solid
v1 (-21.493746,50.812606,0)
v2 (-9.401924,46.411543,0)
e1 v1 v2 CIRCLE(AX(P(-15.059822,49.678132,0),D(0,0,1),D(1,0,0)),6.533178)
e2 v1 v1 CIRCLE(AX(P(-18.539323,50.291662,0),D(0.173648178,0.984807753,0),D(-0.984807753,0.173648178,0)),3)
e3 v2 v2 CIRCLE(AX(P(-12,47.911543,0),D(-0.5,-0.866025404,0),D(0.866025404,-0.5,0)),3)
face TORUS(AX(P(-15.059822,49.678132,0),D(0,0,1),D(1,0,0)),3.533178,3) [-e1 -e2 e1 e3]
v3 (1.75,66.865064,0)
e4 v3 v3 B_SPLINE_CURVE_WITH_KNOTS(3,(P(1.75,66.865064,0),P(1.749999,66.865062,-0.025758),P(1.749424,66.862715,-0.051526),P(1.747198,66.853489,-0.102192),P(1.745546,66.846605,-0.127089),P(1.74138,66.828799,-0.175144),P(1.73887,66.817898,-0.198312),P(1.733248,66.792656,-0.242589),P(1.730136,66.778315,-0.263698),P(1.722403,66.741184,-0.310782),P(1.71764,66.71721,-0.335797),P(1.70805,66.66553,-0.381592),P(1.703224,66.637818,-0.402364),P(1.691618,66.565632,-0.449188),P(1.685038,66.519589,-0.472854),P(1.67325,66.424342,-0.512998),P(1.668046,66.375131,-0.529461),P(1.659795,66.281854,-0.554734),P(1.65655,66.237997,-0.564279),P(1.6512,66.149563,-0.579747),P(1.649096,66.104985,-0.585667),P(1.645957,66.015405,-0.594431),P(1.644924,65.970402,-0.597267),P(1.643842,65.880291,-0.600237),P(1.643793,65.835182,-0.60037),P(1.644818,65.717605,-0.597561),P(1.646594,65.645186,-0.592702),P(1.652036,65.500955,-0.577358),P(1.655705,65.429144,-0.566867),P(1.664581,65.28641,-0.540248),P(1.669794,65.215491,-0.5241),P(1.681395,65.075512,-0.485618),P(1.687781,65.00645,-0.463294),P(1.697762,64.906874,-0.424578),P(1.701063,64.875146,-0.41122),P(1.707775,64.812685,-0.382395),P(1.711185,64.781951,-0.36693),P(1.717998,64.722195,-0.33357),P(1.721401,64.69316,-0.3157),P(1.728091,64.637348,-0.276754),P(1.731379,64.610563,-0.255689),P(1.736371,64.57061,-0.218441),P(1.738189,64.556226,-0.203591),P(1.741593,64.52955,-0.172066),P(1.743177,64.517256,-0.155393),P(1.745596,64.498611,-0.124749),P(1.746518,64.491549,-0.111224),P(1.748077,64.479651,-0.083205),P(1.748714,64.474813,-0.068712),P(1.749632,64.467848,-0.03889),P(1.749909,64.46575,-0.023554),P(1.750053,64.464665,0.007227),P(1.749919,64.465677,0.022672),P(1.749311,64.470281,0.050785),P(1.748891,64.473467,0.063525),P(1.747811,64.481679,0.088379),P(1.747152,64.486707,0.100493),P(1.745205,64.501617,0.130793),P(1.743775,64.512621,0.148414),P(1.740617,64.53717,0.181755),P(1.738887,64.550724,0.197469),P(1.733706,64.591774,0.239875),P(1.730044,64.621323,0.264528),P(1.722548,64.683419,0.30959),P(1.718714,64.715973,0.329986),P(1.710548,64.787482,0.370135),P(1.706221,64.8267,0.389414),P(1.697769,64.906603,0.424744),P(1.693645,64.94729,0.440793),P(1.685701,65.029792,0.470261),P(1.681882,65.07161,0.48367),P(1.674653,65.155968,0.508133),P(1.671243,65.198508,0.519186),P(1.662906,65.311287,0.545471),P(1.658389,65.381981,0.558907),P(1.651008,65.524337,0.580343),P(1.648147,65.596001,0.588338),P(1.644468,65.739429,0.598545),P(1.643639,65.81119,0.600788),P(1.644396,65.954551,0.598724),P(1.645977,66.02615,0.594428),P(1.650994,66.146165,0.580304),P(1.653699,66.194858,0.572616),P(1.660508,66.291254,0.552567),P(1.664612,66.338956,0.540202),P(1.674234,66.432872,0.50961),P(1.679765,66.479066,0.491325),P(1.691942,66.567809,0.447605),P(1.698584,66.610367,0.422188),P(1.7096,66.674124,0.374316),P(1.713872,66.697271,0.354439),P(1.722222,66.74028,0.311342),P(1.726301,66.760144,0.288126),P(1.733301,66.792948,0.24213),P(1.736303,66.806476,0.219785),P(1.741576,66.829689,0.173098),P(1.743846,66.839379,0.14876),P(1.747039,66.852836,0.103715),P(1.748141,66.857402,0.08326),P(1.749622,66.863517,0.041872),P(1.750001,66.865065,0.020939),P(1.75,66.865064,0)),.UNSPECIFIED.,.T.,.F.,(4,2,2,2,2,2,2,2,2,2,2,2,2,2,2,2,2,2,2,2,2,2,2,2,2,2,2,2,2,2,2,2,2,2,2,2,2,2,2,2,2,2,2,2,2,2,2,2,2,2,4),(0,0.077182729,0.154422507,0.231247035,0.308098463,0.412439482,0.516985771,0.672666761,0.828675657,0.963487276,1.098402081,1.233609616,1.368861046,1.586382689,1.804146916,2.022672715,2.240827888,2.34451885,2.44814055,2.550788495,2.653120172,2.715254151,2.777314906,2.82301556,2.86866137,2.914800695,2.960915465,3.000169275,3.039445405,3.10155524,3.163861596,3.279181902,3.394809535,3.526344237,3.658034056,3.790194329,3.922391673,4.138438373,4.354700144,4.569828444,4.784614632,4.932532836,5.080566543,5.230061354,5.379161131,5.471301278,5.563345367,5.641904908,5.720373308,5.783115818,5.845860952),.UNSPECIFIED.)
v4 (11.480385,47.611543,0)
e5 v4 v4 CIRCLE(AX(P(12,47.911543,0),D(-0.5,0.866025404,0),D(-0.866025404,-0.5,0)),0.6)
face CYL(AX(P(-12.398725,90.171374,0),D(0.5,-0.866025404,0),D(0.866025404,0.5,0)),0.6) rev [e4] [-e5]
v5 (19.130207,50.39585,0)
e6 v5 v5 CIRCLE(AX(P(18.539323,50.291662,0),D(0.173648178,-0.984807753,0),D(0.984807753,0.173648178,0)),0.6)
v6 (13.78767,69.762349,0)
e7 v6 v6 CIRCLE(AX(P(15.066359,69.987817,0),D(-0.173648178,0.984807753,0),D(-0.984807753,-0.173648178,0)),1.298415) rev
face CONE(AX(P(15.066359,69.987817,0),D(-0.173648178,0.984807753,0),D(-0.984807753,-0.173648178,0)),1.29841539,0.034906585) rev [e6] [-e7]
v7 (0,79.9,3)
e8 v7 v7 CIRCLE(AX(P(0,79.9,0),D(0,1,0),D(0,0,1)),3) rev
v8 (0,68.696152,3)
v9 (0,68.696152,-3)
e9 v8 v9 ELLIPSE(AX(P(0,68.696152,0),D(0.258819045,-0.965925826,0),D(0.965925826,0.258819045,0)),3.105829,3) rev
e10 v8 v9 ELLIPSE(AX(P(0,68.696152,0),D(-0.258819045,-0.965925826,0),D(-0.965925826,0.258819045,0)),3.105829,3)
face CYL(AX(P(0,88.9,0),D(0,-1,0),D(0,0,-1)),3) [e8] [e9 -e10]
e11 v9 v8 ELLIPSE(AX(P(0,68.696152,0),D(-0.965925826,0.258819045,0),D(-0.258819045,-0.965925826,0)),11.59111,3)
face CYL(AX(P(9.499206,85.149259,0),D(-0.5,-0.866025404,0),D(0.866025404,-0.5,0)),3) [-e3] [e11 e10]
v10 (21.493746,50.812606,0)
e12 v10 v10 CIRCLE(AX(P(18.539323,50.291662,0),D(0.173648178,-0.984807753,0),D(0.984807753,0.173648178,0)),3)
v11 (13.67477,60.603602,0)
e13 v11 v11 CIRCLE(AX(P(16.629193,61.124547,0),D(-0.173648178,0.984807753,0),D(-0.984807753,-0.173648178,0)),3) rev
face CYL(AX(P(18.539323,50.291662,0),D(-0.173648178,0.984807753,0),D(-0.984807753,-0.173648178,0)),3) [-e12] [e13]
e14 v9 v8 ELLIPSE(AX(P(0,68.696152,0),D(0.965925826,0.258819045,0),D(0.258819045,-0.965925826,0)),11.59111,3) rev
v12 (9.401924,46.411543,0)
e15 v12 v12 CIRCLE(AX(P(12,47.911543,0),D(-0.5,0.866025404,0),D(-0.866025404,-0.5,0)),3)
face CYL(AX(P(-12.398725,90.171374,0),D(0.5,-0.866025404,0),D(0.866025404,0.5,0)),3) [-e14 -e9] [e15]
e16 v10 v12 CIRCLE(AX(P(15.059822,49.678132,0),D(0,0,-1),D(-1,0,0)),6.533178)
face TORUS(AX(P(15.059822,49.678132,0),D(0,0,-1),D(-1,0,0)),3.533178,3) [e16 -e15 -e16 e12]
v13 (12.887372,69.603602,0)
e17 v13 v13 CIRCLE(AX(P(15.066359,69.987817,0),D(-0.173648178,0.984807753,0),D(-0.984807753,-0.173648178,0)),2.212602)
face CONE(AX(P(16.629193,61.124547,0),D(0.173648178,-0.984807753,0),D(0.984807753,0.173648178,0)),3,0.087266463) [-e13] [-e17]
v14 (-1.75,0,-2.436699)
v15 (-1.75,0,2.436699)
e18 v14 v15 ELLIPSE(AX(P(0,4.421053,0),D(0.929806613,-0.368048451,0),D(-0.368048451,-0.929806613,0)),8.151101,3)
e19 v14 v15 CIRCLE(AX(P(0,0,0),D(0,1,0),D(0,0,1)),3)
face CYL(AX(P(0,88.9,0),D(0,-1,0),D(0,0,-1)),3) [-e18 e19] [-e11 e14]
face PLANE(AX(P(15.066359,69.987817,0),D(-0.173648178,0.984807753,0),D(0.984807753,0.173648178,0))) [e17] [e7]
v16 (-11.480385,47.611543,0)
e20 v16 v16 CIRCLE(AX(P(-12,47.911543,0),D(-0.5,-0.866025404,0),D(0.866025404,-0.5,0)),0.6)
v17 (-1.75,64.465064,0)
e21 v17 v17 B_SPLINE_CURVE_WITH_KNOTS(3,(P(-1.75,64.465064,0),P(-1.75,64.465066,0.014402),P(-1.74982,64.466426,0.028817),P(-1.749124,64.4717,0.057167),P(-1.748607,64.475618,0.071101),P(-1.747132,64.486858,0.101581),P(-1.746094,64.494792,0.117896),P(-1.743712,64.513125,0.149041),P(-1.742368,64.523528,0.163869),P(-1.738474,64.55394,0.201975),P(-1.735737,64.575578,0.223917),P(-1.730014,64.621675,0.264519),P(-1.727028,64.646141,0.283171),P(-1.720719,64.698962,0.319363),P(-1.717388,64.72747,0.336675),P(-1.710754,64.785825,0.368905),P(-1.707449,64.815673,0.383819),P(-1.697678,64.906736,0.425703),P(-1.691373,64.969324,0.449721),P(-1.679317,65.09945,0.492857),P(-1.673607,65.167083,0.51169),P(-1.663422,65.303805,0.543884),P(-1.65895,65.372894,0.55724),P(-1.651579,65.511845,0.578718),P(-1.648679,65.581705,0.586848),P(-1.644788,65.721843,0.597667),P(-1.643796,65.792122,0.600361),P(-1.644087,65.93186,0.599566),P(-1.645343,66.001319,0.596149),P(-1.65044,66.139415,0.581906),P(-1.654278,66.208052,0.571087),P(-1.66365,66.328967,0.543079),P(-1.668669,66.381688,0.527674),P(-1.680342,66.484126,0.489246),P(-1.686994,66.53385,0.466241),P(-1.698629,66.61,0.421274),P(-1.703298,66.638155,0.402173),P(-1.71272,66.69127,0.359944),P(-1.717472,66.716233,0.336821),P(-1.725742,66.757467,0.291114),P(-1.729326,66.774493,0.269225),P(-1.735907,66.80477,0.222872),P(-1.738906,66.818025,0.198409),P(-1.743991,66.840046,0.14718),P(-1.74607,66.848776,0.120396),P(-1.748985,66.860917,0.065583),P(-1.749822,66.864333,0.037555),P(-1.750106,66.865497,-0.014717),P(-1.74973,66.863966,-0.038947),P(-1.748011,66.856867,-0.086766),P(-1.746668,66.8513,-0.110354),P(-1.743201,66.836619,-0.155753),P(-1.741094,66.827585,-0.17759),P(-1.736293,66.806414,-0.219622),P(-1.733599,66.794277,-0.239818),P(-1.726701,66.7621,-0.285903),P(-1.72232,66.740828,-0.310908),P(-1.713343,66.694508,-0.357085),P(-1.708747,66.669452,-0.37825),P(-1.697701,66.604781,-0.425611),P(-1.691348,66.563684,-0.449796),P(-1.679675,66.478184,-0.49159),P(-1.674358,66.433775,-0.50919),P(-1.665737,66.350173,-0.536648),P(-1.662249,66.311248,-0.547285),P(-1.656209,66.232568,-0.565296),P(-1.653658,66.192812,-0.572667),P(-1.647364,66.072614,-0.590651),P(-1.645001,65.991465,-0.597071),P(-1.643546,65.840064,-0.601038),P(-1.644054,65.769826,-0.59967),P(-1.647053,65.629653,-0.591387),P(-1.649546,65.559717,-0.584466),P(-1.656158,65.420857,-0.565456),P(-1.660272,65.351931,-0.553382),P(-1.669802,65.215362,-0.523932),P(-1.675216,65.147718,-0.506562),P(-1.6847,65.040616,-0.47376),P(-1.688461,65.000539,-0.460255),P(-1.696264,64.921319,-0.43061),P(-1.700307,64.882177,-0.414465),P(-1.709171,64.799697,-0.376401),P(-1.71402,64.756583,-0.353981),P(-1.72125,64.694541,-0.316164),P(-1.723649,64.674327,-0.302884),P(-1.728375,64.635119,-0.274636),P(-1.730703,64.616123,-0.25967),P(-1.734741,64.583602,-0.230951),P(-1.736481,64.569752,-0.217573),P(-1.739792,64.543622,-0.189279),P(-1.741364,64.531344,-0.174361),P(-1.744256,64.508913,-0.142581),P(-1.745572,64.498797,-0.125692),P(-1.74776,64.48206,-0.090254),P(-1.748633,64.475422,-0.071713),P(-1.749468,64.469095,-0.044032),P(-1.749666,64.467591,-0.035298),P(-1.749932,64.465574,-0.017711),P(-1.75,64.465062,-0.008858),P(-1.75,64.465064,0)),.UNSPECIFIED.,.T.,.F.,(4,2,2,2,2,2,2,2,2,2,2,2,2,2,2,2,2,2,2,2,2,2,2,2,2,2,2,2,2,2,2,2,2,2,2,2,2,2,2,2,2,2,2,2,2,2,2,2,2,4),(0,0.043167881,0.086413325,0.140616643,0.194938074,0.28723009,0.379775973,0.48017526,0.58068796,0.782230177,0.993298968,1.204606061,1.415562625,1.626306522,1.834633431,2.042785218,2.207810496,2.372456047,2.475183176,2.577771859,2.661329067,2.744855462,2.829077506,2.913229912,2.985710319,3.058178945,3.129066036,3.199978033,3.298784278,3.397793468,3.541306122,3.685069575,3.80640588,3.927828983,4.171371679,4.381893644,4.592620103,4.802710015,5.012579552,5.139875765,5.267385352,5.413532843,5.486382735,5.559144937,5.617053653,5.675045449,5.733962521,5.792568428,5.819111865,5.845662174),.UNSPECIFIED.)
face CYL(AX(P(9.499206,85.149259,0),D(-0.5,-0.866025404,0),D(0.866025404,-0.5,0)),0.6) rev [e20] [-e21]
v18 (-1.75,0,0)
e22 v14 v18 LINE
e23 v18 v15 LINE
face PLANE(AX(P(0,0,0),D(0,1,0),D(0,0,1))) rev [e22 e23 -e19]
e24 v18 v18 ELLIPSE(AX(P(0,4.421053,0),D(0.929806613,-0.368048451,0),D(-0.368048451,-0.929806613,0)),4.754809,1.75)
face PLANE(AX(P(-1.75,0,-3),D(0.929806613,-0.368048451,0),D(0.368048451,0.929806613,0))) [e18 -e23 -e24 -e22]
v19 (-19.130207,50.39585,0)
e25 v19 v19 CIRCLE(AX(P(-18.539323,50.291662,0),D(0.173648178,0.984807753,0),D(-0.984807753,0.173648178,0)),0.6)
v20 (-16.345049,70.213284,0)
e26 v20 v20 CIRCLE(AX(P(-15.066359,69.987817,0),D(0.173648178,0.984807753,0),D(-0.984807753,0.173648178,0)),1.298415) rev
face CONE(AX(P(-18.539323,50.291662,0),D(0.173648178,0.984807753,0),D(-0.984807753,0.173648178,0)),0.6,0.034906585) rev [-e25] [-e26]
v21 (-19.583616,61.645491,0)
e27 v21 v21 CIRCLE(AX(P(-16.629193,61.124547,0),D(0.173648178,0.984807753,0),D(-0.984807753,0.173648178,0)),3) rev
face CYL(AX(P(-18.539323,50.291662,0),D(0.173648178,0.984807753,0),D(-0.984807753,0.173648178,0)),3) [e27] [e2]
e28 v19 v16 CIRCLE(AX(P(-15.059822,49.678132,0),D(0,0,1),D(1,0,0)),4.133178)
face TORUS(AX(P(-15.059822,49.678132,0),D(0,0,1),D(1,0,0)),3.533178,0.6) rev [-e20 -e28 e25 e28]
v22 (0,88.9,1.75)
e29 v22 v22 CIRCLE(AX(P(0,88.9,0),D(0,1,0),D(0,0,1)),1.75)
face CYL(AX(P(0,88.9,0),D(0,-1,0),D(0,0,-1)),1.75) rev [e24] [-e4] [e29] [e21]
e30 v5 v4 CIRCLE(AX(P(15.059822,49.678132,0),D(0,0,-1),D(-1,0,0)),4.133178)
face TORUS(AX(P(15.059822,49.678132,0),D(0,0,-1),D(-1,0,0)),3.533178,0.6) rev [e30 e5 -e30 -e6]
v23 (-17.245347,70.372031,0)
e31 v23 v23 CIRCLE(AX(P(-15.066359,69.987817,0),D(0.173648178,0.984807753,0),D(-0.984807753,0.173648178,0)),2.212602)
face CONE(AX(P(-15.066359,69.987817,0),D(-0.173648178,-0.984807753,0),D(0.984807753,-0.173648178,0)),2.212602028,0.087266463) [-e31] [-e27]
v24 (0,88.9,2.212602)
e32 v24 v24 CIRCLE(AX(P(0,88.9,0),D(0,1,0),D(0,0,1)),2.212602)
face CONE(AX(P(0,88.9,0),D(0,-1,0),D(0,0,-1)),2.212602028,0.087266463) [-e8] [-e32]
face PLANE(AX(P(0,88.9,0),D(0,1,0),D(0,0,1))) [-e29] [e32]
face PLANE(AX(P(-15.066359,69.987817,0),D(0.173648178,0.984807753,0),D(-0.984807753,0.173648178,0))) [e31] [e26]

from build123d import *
from OCP.BRepFilletAPI import BRepFilletAPI_MakeChamfer

# Parameters (mm, degrees)
SKETCH1_R                       = 3
SKETCH1_R_2                     = 1.75
BOSS_EXTRUDE1_DEPTH             = 88.9
CUT_EXTRUDE1_DEPTH              = 90.001179767
CUT_EXTRUDE1_DEPTH_BACK         = 90.001179767
SKETCH4_R                       = 0.6
CUT_EXTRUDE3_DEPTH              = 76.2
CUT_EXTRUDE3_DIRECTION_2_REACH  = 65.853
SKETCH6_R                       = 3
SKETCH6_R_2                     = 0.6
BOSS_EXTRUDE2_DEPTH             = 10
BOSS_EXTRUDE2_DIRECTION_2_REACH = 59.527
SKETCH8_R                       = 3
SKETCH8_R_2                     = 0.6
CHAMFER2_SIZE                   = 0.69841539
CHAMFER2_SIZE_2                 = 20
CHAMFER1_SIZE                   = 9
CHAMFER1_SIZE2                  = 0.787397972


with BuildPart() as part:
    # Sketch1 → Boss-Extrude1 (new body)
    with BuildSketch(Plane(origin=(0, 0, 0), x_dir=(1, 0, 0), z_dir=(0, 1, 0))):
        with Locations(Location((0, 0, 0), (0, 0, 270))):
            Circle(SKETCH1_R)
        with Locations(Location((0, 0, 0), (0, 0, 270))):
            Circle(SKETCH1_R_2, mode=Mode.SUBTRACT)
    extrude(amount=BOSS_EXTRUDE1_DEPTH)

    # Sketch2 → Cut-Extrude1 (cut, two sides: drawn at the far end of the back side and taken through both)
    with BuildSketch(Plane.XY.offset(-CUT_EXTRUDE1_DEPTH_BACK)):
        Polygon((-1.75, 0), (3, 12), (3, 0), align=None)
    extrude(amount=CUT_EXTRUDE1_DEPTH + CUT_EXTRUDE1_DEPTH_BACK, mode=Mode.SUBTRACT)

    # Sketch4 → Cut-Extrude3 (cut)
    with BuildSketch(Plane(origin=(-3, 63.5, 0), x_dir=(-0.8660254037844363, 0.5000000000000043, 0), z_dir=(-0.5000000000000042, -0.8660254037844362, 0))):
        with Locations(Location((0, 0, 0), (0, 0, 180))):
            Circle(SKETCH4_R)
    cut_extrude3 = extrude(amount=CUT_EXTRUDE3_DEPTH, mode=Mode.SUBTRACT)

    # Sketch4 → Cut-Extrude3 direction 2 (cut, up to next)
    with BuildSketch(Plane(origin=(-3, 63.5, 0), x_dir=(-0.8660254037844363, 0.5000000000000043, 0), z_dir=(-0.5000000000000042, -0.8660254037844362, 0)), mode=Mode.PRIVATE) as cut_extrude3_direction_2_sk1:
        with Locations(Location((0, 0, 0), (0, 0, 180))):
            Circle(SKETCH4_R)
    cut_extrude3_direction_2_tool1 = extrude(cut_extrude3_direction_2_sk1.sketch, amount=-CUT_EXTRUDE3_DIRECTION_2_REACH, mode=Mode.PRIVATE) & part.part
    cut_extrude3_direction_2 = cut_extrude3_direction_2_tool1.solids().sort_by_distance((-3, 63.5, 0))[0]
    add(cut_extrude3_direction_2, mode=Mode.SUBTRACT)

    # Sketch6 → Boss-Extrude2 (add)
    with BuildSketch(Plane(origin=(-7, 56.57179677, 0), x_dir=(-0.8660254037844363, 0.5000000000000043, 0), z_dir=(-0.5000000000000042, -0.8660254037844362, 0))):
        with Locations(Location((0, 0, 0), (0, 0, 180))):
            Circle(SKETCH6_R)
        with Locations(Location((0, 0, 0), (0, 0, 180))):
            Circle(SKETCH6_R_2, mode=Mode.SUBTRACT)
    boss_extrude2 = extrude(amount=BOSS_EXTRUDE2_DEPTH)

    # Sketch6 → Boss-Extrude2 direction 2 (add, up to next)
    with BuildSketch(Plane(origin=(-7, 56.57179677, 0), x_dir=(-0.8660254037844363, 0.5000000000000043, 0), z_dir=(-0.5000000000000042, -0.8660254037844362, 0)), mode=Mode.PRIVATE) as boss_extrude2_direction_2_sk1:
        with Locations(Location((0, 0, 0), (0, 0, 180))):
            Circle(SKETCH6_R)
        with Locations(Location((0, 0, 0), (0, 0, 180))):
            Circle(SKETCH6_R_2, mode=Mode.SUBTRACT)
    boss_extrude2_direction_2_tool1 = extrude(boss_extrude2_direction_2_sk1.sketch, amount=-BOSS_EXTRUDE2_DIRECTION_2_REACH, mode=Mode.PRIVATE) - part.part
    boss_extrude2_direction_2 = boss_extrude2_direction_2_tool1.solids().sort_by_distance((-9.524592, 58.02937, 0))[0]
    add(boss_extrude2_direction_2)

    # Mirror2: Cut-Extrude3, Cut-Extrude3 direction 2, Boss-Extrude2, Boss-Extrude2 direction 2 across plane
    add(cut_extrude3.mirror(Plane(origin=(0, 0, 0), x_dir=(0, 0, 1), z_dir=(1, 0, 0))), mode=Mode.SUBTRACT)
    add(cut_extrude3_direction_2.mirror(Plane(origin=(0, 0, 0), x_dir=(0, 0, 1), z_dir=(1, 0, 0))), mode=Mode.SUBTRACT)
    add(boss_extrude2.mirror(Plane(origin=(0, 0, 0), x_dir=(0, 0, 1), z_dir=(1, 0, 0))))
    add(boss_extrude2_direction_2.mirror(Plane(origin=(0, 0, 0), x_dir=(0, 0, 1), z_dir=(1, 0, 0))))

    # Sweep1: sweep along a path in Sketch7
    with BuildLine(Plane.XY) as sweep1_path:
        Line((-15.066359238, 69.98781664), (-18.539322791, 50.29166158))
        ThreePointArc((-18.539322791, 50.29166158), (-16.268239819, 46.358030485), (-12, 47.911542732))
    # Sketch8 → Sweep1 (sweep)
    with BuildSketch(Plane(origin=(17.74630657, 30.737504626, 0), x_dir=(0.8660254037844362, -0.5000000000000046, 0), z_dir=(-0.5000000000000044, -0.866025403784436, 0))):
        with Locations((-34.348076211, 0)):
            Circle(SKETCH8_R)
        with Locations((-34.348076211, 0)):
            Circle(SKETCH8_R_2, mode=Mode.SUBTRACT)
    sweep1 = sweep(path=sweep1_path.line)

    # Mirror3: Sweep1 across plane
    add(sweep1.mirror(Plane(origin=(0, 0, 0), x_dir=(0, 0, 1), z_dir=(1, 0, 0))))

    # Chamfer2
    # the kernel refuses this chamfer: 20, 0.69841539 mm, written as the material it takes off along each edge
    with BuildSketch(Plane(origin=(-15.066359238, 69.98781664, 0), x_dir=(-0.9848077530122084, 0.17364817766692878, 0), z_dir=(0, 0, 1))) as chamfer2_piece_1:
        Polygon((0.6 + CHAMFER2_SIZE, 0), (0.6, CHAMFER2_SIZE_2), (0.6, 0), align=None)
    revolve(axis=Axis((-15.066359238, 69.98781664, 0), (-0.173648177666934, -0.9848077530122075, 0)), mode=Mode.SUBTRACT)
    with BuildSketch(Plane(origin=(15.066359238, 69.98781664, 0), x_dir=(0.9848077530122084, 0.17364817766692878, 0), z_dir=(0, 0, 1))) as chamfer2_piece_2:
        Polygon((0.6 + CHAMFER2_SIZE, 0), (0.6, -CHAMFER2_SIZE_2), (0.6, 0), align=None)
    revolve(axis=Axis((15.066359238, 69.98781664, 0), (-0.173648177666934, 0.9848077530122075, 0)), mode=Mode.SUBTRACT)

    # Chamfer1: one chamfer whose edges measure the first distance from different faces: ONE call of the kernel's chamfer builder (chamfer() names one face for all edges)
    chamfer1_edges_1 = [part.edges().sort_by_distance(p)[0] for p in [
        (0, 88.9, -3),
    ]]
    chamfer1_side_1 = [part.faces().sort_by_distance(p)[0] for p in [
        (0, 78.798076211, -3),
    ]]
    chamfer1_edges_2 = [part.edges().sort_by_distance(p)[0] for p in [
        (-12.111935979, 69.466872107, 0),
    ]]
    chamfer1_side_2 = [part.faces().sort_by_distance(p)[0] for p in [
        (-13.848417755, 59.618794577, 0),
    ]]
    chamfer1_edges_3 = [part.edges().sort_by_distance(p)[0] for p in [
        (12.111935979, 69.466872107, 0),
    ]]
    chamfer1_side_3 = [part.faces().sort_by_distance(p)[0] for p in [
        (13.848417755, 59.618794577, 0),
    ]]
    chamfer1 = BRepFilletAPI_MakeChamfer(part.part.solid().wrapped)
    for e in chamfer1_edges_1:
        chamfer1.Add(CHAMFER1_SIZE, CHAMFER1_SIZE2, e.wrapped, chamfer1_side_1[0].wrapped)  # the first distance lies on this face
    for e in chamfer1_edges_2:
        chamfer1.Add(CHAMFER1_SIZE, CHAMFER1_SIZE2, e.wrapped, chamfer1_side_2[0].wrapped)  # the first distance lies on this face
    for e in chamfer1_edges_3:
        chamfer1.Add(CHAMFER1_SIZE, CHAMFER1_SIZE2, e.wrapped, chamfer1_side_3[0].wrapped)  # the first distance lies on this face
    add(Compound.cast(chamfer1.Shape()), mode=Mode.REPLACE)


solid = part.part
